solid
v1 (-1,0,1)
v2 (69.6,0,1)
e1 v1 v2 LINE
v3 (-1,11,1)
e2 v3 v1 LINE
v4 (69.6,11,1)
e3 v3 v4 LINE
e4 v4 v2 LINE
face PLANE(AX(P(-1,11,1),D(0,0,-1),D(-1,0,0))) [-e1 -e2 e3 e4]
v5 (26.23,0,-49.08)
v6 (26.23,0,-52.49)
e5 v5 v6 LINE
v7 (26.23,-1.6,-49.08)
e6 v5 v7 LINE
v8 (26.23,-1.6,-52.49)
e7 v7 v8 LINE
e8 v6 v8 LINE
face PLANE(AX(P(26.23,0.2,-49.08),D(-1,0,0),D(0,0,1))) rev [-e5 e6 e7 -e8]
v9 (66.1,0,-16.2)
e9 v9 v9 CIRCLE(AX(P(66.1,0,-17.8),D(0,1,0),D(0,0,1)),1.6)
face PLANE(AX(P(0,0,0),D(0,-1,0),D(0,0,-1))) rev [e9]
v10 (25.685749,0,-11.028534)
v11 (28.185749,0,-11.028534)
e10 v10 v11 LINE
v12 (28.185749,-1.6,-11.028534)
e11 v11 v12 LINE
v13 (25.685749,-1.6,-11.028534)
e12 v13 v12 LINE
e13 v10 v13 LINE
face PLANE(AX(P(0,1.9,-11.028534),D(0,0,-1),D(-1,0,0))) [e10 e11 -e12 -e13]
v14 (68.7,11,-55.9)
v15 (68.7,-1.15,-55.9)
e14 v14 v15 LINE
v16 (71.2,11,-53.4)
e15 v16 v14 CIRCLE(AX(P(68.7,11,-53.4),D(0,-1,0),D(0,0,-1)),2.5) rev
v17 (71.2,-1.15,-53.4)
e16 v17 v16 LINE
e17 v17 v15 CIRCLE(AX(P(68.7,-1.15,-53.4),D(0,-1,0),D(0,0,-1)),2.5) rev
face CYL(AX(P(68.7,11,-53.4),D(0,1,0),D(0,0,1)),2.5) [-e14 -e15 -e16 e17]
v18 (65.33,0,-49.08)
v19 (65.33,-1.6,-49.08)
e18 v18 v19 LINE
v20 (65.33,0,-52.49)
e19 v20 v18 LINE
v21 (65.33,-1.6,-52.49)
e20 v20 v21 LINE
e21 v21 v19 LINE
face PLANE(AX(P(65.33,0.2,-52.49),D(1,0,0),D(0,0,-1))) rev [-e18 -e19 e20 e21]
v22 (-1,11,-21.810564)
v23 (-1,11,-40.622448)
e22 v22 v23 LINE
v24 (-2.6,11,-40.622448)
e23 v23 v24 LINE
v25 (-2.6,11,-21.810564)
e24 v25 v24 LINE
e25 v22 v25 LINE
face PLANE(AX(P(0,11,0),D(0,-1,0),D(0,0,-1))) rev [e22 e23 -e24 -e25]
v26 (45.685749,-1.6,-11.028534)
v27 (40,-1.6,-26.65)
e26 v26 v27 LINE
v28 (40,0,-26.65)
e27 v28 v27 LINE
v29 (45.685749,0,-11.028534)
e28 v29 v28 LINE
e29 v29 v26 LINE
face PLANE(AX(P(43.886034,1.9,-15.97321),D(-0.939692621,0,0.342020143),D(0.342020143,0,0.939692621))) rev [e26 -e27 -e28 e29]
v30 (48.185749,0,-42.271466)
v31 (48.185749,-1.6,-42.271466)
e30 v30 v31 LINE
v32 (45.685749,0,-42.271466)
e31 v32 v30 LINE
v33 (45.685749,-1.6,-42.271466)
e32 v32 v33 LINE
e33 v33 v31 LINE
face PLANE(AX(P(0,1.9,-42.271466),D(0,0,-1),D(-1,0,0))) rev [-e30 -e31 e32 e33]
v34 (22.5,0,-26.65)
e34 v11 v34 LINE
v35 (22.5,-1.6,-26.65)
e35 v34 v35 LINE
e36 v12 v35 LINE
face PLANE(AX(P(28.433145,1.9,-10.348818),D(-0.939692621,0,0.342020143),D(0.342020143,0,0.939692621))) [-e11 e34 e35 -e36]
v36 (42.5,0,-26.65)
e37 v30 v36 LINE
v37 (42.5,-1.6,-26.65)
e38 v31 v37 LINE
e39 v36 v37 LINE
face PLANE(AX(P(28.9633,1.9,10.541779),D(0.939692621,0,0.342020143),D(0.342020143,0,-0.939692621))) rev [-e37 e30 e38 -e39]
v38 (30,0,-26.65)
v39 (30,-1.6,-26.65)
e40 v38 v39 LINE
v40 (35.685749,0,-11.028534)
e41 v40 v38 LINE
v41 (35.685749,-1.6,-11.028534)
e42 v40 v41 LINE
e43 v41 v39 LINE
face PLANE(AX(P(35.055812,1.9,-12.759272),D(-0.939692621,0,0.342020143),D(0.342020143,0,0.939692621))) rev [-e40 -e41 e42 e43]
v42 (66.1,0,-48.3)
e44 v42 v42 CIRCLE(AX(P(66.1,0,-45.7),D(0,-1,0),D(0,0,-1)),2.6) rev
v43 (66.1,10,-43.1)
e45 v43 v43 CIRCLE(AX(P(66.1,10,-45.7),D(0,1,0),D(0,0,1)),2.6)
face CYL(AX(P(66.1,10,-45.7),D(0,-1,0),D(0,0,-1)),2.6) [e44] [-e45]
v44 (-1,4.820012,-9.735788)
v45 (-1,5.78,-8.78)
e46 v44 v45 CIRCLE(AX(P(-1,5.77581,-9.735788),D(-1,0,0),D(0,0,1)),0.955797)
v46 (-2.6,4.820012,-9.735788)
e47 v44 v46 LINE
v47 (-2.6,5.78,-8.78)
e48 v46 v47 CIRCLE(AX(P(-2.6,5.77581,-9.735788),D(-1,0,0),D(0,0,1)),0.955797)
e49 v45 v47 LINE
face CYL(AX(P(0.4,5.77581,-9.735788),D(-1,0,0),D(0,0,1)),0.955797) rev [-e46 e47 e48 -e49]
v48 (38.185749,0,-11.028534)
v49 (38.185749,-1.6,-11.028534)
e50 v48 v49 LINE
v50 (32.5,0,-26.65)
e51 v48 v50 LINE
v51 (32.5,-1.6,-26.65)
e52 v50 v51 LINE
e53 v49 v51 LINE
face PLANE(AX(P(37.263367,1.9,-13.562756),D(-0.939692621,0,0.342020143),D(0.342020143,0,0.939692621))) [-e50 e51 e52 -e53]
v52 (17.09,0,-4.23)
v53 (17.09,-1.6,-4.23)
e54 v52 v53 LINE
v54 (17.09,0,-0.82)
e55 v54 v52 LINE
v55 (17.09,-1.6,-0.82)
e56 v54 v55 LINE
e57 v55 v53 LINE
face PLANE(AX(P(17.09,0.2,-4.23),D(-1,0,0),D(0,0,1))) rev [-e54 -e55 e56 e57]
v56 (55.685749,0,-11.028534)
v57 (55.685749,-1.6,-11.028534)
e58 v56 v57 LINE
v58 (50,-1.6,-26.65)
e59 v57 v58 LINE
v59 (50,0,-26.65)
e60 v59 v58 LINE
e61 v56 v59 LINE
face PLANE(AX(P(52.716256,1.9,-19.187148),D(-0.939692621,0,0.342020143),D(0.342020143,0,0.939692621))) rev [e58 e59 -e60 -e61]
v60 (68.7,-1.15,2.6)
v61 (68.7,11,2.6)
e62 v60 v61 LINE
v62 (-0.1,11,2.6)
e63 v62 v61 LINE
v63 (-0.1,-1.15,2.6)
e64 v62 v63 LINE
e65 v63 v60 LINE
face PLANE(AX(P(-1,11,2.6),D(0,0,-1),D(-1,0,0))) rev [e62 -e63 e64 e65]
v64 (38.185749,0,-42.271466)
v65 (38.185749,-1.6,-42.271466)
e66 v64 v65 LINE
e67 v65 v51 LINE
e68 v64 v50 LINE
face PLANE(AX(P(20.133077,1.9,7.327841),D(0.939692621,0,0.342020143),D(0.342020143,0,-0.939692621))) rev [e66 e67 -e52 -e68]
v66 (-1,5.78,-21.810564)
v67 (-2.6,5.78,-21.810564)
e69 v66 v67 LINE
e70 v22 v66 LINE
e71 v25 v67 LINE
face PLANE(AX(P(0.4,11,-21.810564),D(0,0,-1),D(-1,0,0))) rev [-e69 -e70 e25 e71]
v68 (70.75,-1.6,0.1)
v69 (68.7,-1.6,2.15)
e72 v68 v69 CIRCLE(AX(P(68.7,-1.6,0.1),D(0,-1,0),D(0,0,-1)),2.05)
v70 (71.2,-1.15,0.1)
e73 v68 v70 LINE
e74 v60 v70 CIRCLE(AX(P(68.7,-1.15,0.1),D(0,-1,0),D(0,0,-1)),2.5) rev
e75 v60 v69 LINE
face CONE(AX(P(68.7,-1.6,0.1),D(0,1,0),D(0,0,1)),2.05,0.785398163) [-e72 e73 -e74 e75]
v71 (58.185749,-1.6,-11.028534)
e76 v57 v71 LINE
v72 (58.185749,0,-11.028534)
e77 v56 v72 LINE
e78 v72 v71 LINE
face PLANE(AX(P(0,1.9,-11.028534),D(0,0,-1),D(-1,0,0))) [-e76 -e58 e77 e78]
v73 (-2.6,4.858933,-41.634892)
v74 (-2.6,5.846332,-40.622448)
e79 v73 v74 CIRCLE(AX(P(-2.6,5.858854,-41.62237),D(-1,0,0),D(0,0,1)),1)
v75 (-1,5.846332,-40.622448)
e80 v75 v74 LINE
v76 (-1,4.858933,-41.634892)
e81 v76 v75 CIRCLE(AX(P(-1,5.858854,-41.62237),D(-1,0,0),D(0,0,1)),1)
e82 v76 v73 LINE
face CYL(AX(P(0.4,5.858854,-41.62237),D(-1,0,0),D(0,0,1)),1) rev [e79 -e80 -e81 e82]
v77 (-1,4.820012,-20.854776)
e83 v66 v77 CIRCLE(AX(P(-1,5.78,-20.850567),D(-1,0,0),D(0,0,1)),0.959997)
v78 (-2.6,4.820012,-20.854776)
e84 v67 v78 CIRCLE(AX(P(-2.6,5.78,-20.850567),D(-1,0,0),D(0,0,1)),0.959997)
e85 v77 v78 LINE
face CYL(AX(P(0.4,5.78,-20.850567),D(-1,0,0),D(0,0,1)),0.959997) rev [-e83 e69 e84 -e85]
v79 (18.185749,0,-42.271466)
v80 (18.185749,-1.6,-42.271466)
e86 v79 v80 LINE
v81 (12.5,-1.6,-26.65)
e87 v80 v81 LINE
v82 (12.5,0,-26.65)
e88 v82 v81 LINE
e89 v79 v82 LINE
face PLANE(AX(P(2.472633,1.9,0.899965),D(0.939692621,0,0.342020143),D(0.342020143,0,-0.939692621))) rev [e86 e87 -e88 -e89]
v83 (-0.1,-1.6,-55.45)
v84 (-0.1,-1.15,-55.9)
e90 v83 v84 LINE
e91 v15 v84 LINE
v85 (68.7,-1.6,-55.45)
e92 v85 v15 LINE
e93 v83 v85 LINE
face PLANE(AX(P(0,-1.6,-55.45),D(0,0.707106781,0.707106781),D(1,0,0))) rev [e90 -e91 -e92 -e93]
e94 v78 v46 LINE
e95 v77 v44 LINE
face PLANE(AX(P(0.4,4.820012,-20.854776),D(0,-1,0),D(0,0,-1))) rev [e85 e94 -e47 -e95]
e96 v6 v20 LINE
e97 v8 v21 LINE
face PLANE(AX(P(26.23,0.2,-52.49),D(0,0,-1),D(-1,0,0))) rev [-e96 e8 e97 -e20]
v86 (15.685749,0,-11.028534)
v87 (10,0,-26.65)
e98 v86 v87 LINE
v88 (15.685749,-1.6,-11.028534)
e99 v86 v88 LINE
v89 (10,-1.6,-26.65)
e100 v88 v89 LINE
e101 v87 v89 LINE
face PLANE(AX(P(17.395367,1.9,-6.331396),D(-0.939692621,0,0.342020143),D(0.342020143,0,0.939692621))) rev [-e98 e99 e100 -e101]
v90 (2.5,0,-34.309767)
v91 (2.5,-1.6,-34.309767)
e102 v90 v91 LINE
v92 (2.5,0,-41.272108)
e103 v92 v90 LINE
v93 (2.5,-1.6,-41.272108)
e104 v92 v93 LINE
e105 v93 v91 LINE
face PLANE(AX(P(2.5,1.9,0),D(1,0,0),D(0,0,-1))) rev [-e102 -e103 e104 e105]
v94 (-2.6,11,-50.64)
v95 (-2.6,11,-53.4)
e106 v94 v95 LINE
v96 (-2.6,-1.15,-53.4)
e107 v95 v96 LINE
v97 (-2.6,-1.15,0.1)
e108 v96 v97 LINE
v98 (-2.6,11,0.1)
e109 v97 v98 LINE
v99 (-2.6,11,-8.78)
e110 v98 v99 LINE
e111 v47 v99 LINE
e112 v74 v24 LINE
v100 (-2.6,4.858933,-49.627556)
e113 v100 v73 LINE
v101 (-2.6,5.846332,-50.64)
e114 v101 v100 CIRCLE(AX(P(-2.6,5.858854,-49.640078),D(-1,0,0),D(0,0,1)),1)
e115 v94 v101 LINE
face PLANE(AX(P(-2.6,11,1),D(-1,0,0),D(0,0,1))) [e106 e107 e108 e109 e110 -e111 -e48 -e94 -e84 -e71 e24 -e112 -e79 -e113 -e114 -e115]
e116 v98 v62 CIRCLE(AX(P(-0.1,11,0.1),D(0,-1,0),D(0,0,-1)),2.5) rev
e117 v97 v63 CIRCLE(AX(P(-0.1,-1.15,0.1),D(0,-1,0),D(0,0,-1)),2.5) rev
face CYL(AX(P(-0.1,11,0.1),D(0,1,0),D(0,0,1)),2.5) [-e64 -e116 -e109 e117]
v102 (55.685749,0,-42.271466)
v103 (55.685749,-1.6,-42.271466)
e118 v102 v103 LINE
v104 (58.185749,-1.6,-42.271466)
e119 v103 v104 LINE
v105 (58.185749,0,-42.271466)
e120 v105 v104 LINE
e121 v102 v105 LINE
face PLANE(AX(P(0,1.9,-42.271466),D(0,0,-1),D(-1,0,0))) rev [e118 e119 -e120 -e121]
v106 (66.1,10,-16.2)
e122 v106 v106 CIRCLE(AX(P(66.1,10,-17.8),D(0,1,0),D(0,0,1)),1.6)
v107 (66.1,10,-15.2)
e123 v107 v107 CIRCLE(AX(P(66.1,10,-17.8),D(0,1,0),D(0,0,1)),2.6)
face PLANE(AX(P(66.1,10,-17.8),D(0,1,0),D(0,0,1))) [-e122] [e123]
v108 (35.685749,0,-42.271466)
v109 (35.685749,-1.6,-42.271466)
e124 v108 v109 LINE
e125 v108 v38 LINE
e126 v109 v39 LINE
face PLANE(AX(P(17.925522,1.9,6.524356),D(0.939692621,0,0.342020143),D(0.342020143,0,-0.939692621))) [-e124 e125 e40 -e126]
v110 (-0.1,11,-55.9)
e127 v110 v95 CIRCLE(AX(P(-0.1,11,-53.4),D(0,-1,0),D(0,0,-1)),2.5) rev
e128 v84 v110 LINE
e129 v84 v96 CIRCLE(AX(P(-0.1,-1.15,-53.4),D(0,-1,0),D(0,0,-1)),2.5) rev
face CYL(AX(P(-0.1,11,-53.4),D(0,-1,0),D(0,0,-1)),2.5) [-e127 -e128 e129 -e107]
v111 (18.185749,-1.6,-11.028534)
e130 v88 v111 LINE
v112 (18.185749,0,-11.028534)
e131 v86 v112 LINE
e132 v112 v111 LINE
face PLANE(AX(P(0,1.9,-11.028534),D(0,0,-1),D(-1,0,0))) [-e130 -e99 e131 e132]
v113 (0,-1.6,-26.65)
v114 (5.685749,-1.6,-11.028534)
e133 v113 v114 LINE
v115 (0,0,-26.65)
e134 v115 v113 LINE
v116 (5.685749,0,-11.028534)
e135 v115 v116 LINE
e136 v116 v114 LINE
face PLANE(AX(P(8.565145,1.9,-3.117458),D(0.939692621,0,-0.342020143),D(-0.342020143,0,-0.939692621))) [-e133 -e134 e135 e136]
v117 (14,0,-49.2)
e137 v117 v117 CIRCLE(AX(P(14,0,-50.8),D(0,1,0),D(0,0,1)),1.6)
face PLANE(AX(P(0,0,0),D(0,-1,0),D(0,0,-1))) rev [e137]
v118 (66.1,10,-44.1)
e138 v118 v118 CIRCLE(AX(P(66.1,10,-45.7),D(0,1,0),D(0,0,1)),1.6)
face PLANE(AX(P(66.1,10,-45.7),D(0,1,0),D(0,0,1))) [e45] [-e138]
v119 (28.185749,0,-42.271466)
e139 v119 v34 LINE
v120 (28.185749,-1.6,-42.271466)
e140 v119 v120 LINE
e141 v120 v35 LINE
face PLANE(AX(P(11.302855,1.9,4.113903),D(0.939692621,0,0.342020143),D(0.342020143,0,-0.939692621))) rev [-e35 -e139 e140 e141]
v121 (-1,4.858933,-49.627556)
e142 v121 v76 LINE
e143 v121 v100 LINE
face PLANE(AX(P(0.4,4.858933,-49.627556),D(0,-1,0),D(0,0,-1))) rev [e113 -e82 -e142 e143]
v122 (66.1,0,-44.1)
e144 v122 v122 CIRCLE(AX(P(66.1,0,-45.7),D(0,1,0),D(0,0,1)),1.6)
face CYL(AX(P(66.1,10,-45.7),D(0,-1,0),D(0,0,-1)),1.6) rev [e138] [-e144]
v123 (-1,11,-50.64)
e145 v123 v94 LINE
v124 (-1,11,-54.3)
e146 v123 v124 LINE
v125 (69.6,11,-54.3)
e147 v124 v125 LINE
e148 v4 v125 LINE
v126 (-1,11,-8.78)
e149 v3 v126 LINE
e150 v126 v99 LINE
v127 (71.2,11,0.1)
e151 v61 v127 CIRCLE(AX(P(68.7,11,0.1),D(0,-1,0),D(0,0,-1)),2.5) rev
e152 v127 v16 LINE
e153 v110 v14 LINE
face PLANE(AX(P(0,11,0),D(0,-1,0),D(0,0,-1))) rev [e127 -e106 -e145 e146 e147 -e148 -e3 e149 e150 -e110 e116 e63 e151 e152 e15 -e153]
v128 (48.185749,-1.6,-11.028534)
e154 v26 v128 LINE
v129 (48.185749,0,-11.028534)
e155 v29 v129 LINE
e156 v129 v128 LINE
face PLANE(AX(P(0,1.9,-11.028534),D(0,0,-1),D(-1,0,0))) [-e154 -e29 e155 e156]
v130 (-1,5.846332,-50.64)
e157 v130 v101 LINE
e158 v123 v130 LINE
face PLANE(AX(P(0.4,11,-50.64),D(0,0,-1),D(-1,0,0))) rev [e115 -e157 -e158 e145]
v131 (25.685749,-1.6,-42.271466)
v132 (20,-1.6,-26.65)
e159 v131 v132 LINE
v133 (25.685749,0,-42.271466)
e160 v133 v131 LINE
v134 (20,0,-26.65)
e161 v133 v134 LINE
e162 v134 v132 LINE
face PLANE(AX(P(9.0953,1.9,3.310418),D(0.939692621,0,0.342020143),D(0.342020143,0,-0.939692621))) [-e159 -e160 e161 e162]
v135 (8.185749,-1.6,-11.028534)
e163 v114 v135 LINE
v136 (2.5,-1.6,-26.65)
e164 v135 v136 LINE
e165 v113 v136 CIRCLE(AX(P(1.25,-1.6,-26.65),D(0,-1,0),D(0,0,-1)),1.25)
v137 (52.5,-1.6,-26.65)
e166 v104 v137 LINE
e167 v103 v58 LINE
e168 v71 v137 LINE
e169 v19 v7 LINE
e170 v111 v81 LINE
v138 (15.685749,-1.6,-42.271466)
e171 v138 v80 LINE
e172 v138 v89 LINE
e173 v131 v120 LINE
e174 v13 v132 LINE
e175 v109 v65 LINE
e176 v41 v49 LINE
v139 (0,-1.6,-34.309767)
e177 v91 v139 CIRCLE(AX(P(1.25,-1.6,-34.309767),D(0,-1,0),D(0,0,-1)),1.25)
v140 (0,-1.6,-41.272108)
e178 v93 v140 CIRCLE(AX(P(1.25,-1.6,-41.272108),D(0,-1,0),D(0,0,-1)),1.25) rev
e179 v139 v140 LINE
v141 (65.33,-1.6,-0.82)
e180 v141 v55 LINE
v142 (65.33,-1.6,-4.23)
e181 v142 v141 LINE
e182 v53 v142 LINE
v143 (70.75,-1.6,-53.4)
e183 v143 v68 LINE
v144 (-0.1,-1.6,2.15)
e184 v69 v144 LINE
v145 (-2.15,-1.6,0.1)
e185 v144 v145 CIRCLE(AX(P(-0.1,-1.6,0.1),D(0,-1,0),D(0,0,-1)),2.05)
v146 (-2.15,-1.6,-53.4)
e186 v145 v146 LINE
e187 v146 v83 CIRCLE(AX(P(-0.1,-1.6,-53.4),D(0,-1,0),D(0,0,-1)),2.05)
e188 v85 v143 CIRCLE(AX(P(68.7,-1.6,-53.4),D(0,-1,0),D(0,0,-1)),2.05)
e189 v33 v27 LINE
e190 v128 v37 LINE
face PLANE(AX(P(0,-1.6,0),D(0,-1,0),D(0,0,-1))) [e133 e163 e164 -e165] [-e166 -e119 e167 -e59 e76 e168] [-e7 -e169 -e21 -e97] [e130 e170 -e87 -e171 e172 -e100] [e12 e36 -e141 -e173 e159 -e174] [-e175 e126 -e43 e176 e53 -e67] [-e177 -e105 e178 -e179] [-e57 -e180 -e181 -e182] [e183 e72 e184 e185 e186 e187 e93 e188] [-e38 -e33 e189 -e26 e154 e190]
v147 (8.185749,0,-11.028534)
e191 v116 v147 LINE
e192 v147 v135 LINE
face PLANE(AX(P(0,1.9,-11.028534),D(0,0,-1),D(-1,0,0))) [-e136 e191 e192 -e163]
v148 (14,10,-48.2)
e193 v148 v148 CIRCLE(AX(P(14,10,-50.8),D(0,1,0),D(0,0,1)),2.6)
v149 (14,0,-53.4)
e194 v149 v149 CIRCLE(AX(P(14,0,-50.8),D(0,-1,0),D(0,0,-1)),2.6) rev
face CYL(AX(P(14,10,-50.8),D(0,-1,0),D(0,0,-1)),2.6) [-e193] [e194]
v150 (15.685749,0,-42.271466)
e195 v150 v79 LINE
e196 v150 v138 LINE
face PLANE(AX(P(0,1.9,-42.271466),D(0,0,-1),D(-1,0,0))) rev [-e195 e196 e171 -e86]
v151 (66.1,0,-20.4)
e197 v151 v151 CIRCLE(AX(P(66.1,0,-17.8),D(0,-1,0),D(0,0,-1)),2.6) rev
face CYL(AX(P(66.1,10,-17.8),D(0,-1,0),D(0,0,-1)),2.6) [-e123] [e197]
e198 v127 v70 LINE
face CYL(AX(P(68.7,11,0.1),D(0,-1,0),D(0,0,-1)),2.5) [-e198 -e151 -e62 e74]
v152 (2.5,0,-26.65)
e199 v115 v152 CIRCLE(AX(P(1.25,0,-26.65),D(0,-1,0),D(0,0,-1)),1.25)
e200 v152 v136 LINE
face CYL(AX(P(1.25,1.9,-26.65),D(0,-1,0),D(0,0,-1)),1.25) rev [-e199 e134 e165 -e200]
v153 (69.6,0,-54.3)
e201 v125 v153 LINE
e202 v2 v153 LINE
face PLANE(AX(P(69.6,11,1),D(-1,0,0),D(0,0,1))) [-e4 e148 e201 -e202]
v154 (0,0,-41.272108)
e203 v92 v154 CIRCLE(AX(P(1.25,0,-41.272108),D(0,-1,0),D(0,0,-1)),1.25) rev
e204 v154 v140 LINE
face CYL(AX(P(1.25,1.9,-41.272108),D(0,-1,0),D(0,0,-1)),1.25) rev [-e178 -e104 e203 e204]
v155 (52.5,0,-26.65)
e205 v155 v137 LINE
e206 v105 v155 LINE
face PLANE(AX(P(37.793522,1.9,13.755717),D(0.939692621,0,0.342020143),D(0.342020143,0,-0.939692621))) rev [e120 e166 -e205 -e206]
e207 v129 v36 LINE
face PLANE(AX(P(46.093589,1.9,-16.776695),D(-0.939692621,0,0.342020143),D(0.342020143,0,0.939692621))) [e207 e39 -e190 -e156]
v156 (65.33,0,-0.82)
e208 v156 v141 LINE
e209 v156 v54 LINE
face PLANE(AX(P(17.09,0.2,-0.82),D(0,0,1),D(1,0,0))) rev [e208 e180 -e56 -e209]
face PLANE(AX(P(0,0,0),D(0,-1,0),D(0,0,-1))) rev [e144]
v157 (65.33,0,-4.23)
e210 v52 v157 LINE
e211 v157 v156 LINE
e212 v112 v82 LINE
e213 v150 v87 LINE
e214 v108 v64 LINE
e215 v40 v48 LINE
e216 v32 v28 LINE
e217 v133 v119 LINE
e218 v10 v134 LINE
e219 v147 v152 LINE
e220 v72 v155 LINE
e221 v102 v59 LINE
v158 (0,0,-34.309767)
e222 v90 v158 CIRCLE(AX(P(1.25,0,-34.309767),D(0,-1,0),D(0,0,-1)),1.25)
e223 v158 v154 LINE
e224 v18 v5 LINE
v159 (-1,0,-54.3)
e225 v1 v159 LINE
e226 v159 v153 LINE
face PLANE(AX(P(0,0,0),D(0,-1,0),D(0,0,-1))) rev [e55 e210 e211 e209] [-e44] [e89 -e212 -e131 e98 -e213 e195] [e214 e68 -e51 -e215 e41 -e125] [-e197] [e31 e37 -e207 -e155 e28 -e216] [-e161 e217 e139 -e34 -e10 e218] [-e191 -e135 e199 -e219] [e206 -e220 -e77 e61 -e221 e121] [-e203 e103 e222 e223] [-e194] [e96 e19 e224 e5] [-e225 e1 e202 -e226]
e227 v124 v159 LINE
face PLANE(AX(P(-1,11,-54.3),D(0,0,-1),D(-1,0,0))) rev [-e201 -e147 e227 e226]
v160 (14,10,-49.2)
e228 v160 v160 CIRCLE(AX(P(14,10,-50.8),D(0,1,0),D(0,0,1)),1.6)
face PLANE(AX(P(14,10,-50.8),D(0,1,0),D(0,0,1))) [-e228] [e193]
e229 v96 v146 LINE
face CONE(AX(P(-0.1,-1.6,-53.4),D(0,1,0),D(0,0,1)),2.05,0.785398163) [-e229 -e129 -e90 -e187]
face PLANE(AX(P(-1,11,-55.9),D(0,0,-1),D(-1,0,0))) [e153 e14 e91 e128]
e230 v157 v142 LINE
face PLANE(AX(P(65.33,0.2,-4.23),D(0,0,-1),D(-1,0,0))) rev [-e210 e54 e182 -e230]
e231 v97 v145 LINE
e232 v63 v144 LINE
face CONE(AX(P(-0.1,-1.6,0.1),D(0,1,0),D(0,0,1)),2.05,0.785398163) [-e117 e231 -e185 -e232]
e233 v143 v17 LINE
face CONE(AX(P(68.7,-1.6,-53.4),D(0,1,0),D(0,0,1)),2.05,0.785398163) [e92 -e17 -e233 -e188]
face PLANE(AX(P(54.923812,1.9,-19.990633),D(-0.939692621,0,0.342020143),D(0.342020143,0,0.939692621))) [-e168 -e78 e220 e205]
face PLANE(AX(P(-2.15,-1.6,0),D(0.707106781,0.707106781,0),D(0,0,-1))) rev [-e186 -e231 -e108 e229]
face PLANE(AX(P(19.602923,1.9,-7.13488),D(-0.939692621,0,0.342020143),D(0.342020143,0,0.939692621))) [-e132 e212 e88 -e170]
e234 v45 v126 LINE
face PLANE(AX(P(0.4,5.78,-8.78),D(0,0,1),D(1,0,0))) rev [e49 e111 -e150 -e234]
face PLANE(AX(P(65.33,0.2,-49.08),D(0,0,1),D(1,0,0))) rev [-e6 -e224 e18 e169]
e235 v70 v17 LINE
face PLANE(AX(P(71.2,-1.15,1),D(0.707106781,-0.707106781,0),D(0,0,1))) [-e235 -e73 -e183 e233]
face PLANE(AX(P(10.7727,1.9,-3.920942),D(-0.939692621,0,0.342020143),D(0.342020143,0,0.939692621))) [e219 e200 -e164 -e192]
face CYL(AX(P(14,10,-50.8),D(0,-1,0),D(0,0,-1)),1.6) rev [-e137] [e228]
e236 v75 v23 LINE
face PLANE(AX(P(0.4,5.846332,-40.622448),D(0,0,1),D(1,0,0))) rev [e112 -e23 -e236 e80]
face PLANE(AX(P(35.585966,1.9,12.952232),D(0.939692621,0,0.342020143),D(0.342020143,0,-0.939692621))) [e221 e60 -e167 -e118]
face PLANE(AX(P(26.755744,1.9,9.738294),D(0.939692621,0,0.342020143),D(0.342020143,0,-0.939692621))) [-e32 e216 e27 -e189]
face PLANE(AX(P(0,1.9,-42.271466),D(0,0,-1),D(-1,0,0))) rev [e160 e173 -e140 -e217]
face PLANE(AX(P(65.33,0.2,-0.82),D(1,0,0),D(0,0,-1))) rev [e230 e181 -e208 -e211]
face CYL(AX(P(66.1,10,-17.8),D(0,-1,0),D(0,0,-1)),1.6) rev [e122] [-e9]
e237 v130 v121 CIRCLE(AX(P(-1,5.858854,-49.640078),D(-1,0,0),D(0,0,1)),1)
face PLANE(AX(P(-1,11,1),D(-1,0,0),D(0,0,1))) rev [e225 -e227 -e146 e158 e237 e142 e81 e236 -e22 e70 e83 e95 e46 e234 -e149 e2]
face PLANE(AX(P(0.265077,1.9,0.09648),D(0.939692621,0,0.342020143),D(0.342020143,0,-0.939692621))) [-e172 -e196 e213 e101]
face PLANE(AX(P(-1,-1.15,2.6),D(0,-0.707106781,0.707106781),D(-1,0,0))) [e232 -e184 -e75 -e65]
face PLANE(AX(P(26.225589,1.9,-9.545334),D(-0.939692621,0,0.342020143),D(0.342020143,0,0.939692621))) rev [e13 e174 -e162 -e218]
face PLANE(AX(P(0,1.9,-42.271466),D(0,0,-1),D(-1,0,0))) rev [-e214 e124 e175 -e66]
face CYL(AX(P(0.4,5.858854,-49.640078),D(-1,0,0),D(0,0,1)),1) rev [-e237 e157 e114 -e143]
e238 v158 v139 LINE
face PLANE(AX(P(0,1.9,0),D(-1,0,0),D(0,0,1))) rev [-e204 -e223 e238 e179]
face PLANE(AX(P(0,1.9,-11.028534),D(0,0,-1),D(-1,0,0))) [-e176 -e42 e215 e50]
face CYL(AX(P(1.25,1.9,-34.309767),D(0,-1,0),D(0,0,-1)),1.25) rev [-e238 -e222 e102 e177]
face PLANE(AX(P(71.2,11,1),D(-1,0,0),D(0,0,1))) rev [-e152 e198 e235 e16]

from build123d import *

# Parameters (mm, degrees)
SKETCH2_W           = 70.6
SKETCH2_H           = 55.3
BOSS_EXTRUDE1_DEPTH = 11
SHELL1_T            = 1.6
FILLET1_R           = 2.5
SKETCH2_4_R         = 2.6
SKETCH2_4_R_2       = 1.6
BOSS_EXTRUDE2_DEPTH = 10
CUT_EXTRUDE1_DEPTH  = 3
CUT_EXTRUDE2_DEPTH  = 3
SKETCH8_W           = 48.24
SKETCH8_H           = 3.41
SKETCH8_W_2         = 39.1
CUT_EXTRUDE3_DEPTH  = 1.8
CUT_EXTRUDE4_DEPTH  = 3.5
CHAMFER1_SIZE       = 0.45


with BuildPart() as part:
    # Sketch2 → Boss-Extrude1 (new body)
    with BuildSketch(Plane(origin=(0, 0, 0), x_dir=(1, 0, 0), z_dir=(0, 1, 0))):
        with Locations((34.3, 26.65)):
            Rectangle(SKETCH2_W, SKETCH2_H)
    extrude(amount=BOSS_EXTRUDE1_DEPTH)

    # Shell1
    shell1_openings = [part.faces().sort_by_distance(p)[0] for p in [
        (34.3, 11, -26.65),
    ]]
    offset(amount=SHELL1_T, openings=shell1_openings, kind=Kind.INTERSECTION)

    # Fillet1
    # the kernel refuses this fillet: 2.5 mm, written as the material it takes off along each edge
    with BuildSketch(Plane(origin=(-2.6, 17.25, 2.6), x_dir=(1, 0, 0), z_dir=(0, -1, 0)), Plane(origin=(71.2, 17.25, 2.6), x_dir=(0, 0, -1), z_dir=(0, -1, 0)), Plane(origin=(71.2, 17.25, -55.9), x_dir=(-1, 0, 0), z_dir=(0, -1, 0)), Plane(origin=(-2.6, -7.85, -55.9), x_dir=(1, 0, 0), z_dir=(0, 1, 0))) as fillet1_piece_1:
        with BuildLine():
            CenterArc((FILLET1_R, -FILLET1_R), FILLET1_R, 90, 90)
            Line((0, -FILLET1_R), (0, 0))
            Line((0, 0), (FILLET1_R, 0))
        make_face()
    extrude(amount=25.1, mode=Mode.SUBTRACT)

    # Sketch2<4> → Boss-Extrude2 (add)
    # profile 1 of 3: a face of its own
    with BuildSketch(Plane(origin=(0, 0, 0), x_dir=(1, 0, 0), z_dir=(0, 1, 0))):
        with Locations(Location((66.1, 17.8, 0), (0, 0, 90))):
            Circle(SKETCH2_4_R)
        with Locations(Location((66.1, 17.8, 0), (0, 0, 270))):
            Circle(SKETCH2_4_R_2, mode=Mode.SUBTRACT)
    # profile 2 of 3: a face of its own
    with BuildSketch(Plane(origin=(0, 0, 0), x_dir=(1, 0, 0), z_dir=(0, 1, 0))):
        with Locations(Location((14, 50.8, 0), (0, 0, 90))):
            Circle(SKETCH2_4_R)
        with Locations(Location((14, 50.8, 0), (0, 0, 270))):
            Circle(SKETCH2_4_R_2, mode=Mode.SUBTRACT)
    # profile 3 of 3: a face of its own
    with BuildSketch(Plane(origin=(0, 0, 0), x_dir=(1, 0, 0), z_dir=(0, 1, 0))):
        with Locations(Location((66.1, 45.7, 0), (0, 0, 90))):
            Circle(SKETCH2_4_R)
        with Locations(Location((66.1, 45.7, 0), (0, 0, 270))):
            Circle(SKETCH2_4_R_2, mode=Mode.SUBTRACT)
    extrude(amount=BOSS_EXTRUDE2_DEPTH)

    # Sketch4 → Cut-Extrude1 (cut)
    with BuildSketch(Plane.ZY.offset(2.6)):
        with BuildLine():
            Line((-21.810563814, 11), (-21.810563814, 5.78))
            ThreePointArc((-21.810563814, 5.78), (-21.530873699, 5.10266948), (-20.854775908, 4.820012494))
            Line((-20.854775908, 4.820012494), (-9.735787906, 4.820012494))
            ThreePointArc((-9.735787906, 4.820012494), (-9.058457386, 5.101442143), (-8.78, 5.78))
            Line((-8.78, 5.78), (-8.78, 11))
            Line((-8.78, 11), (-21.810563814, 11))
        make_face()
    extrude(amount=-CUT_EXTRUDE1_DEPTH, mode=Mode.SUBTRACT)

    # Sketch6 → Cut-Extrude2 (cut)
    with BuildSketch(Plane.ZY.offset(2.6)):
        with BuildLine():
            Line((-50.64, 11), (-50.64, 5.846332149))
            ThreePointArc((-50.64, 5.846332149), (-50.33827519, 5.142948487), (-49.627556174, 4.858932788))
            Line((-49.627556174, 4.858932788), (-41.634891875, 4.858932788))
            ThreePointArc((-41.634891875, 4.858932788), (-40.924172858, 5.142948487), (-40.622448048, 5.846332149))
            Line((-40.622448048, 5.846332149), (-40.622448048, 11))
            Line((-40.622448048, 11), (-50.64, 11))
        make_face()
    extrude(amount=-CUT_EXTRUDE2_DEPTH, mode=Mode.SUBTRACT)

    # Sketch8 → Cut-Extrude3 (cut)
    with BuildSketch(Plane.XZ.offset(1.6)):
        with Locations((41.21, -2.525)):
            Rectangle(SKETCH8_W, SKETCH8_H)
        with Locations((45.78, -50.785)):
            Rectangle(SKETCH8_W_2, SKETCH8_H)
    extrude(amount=-CUT_EXTRUDE3_DEPTH, mode=Mode.SUBTRACT)

    # Sketch10 → Cut-Extrude4 (cut)
    with BuildSketch(Plane(origin=(0, -1.6, 0), x_dir=(-1, 0, 0), z_dir=(0, -1, 0))):
        Polygon((-2.5, 26.65), (0, 26.65), (-5.685748819, 11.028533507), (-8.185748819, 11.028533507), align=None)
        with BuildLine():
            Line((-2.5, 26.65), (0, 26.65))
            ThreePointArc((0, 26.65), (-1.25, 27.9), (-2.5, 26.65))
        make_face()
        with BuildLine():
            Line((-2.5, 41.272108294), (-2.5, 34.309766621))
            ThreePointArc((-2.5, 34.309766621), (-1.25, 33.059766621), (0, 34.309766621))
            Line((0, 34.309766621), (0, 41.272108294))
            ThreePointArc((0, 41.272108294), (-1.25, 42.522108294), (-2.5, 41.272108294))
        make_face()
        Polygon((-15.685748819, 11.028533507), (-10, 26.65), (-12.5, 26.65), (-18.185748819, 11.028533507), align=None)
        Polygon((-12.5, 26.65), (-10, 26.65), (-15.685748819, 42.271466493), (-18.185748819, 42.271466493), align=None)
        Polygon((-25.685748819, 11.028533507), (-20, 26.65), (-22.5, 26.65), (-28.185748819, 11.028533507), align=None)
        Polygon((-22.5, 26.65), (-20, 26.65), (-25.685748819, 42.271466493), (-28.185748819, 42.271466493), align=None)
        Polygon((-35.685748819, 11.028533507), (-30, 26.65), (-32.5, 26.65), (-38.185748819, 11.028533507), align=None)
        Polygon((-32.5, 26.65), (-30, 26.65), (-35.685748819, 42.271466493), (-38.185748819, 42.271466493), align=None)
        Polygon((-45.685748819, 11.028533507), (-40, 26.65), (-42.5, 26.65), (-48.185748819, 11.028533507), align=None)
        Polygon((-42.5, 26.65), (-40, 26.65), (-45.685748819, 42.271466493), (-48.185748819, 42.271466493), align=None)
        Polygon((-55.685748819, 11.028533507), (-50, 26.65), (-52.5, 26.65), (-58.185748819, 11.028533507), align=None)
        Polygon((-52.5, 26.65), (-50, 26.65), (-55.685748819, 42.271466493), (-58.185748819, 42.271466493), align=None)
    extrude(amount=-CUT_EXTRUDE4_DEPTH, mode=Mode.SUBTRACT)

    # Chamfer1
    chamfer1_edges = [part.edges().sort_by_distance(p)[0] for p in [
        (-2.6, -1.6, -26.65),
        (34.3, -1.6, -55.9),
        (71.2, -1.6, -26.65),
        (34.3, -1.6, 2.6),
        (70.467766953, -1.6, 1.867766953),
        (70.467766953, -1.6, -55.167766953),
        (-1.867766953, -1.6, 1.867766953),
        (-1.867766953, -1.6, -55.167766953),
    ]]
    chamfer(chamfer1_edges, length=CHAMFER1_SIZE)


solid = part.part
